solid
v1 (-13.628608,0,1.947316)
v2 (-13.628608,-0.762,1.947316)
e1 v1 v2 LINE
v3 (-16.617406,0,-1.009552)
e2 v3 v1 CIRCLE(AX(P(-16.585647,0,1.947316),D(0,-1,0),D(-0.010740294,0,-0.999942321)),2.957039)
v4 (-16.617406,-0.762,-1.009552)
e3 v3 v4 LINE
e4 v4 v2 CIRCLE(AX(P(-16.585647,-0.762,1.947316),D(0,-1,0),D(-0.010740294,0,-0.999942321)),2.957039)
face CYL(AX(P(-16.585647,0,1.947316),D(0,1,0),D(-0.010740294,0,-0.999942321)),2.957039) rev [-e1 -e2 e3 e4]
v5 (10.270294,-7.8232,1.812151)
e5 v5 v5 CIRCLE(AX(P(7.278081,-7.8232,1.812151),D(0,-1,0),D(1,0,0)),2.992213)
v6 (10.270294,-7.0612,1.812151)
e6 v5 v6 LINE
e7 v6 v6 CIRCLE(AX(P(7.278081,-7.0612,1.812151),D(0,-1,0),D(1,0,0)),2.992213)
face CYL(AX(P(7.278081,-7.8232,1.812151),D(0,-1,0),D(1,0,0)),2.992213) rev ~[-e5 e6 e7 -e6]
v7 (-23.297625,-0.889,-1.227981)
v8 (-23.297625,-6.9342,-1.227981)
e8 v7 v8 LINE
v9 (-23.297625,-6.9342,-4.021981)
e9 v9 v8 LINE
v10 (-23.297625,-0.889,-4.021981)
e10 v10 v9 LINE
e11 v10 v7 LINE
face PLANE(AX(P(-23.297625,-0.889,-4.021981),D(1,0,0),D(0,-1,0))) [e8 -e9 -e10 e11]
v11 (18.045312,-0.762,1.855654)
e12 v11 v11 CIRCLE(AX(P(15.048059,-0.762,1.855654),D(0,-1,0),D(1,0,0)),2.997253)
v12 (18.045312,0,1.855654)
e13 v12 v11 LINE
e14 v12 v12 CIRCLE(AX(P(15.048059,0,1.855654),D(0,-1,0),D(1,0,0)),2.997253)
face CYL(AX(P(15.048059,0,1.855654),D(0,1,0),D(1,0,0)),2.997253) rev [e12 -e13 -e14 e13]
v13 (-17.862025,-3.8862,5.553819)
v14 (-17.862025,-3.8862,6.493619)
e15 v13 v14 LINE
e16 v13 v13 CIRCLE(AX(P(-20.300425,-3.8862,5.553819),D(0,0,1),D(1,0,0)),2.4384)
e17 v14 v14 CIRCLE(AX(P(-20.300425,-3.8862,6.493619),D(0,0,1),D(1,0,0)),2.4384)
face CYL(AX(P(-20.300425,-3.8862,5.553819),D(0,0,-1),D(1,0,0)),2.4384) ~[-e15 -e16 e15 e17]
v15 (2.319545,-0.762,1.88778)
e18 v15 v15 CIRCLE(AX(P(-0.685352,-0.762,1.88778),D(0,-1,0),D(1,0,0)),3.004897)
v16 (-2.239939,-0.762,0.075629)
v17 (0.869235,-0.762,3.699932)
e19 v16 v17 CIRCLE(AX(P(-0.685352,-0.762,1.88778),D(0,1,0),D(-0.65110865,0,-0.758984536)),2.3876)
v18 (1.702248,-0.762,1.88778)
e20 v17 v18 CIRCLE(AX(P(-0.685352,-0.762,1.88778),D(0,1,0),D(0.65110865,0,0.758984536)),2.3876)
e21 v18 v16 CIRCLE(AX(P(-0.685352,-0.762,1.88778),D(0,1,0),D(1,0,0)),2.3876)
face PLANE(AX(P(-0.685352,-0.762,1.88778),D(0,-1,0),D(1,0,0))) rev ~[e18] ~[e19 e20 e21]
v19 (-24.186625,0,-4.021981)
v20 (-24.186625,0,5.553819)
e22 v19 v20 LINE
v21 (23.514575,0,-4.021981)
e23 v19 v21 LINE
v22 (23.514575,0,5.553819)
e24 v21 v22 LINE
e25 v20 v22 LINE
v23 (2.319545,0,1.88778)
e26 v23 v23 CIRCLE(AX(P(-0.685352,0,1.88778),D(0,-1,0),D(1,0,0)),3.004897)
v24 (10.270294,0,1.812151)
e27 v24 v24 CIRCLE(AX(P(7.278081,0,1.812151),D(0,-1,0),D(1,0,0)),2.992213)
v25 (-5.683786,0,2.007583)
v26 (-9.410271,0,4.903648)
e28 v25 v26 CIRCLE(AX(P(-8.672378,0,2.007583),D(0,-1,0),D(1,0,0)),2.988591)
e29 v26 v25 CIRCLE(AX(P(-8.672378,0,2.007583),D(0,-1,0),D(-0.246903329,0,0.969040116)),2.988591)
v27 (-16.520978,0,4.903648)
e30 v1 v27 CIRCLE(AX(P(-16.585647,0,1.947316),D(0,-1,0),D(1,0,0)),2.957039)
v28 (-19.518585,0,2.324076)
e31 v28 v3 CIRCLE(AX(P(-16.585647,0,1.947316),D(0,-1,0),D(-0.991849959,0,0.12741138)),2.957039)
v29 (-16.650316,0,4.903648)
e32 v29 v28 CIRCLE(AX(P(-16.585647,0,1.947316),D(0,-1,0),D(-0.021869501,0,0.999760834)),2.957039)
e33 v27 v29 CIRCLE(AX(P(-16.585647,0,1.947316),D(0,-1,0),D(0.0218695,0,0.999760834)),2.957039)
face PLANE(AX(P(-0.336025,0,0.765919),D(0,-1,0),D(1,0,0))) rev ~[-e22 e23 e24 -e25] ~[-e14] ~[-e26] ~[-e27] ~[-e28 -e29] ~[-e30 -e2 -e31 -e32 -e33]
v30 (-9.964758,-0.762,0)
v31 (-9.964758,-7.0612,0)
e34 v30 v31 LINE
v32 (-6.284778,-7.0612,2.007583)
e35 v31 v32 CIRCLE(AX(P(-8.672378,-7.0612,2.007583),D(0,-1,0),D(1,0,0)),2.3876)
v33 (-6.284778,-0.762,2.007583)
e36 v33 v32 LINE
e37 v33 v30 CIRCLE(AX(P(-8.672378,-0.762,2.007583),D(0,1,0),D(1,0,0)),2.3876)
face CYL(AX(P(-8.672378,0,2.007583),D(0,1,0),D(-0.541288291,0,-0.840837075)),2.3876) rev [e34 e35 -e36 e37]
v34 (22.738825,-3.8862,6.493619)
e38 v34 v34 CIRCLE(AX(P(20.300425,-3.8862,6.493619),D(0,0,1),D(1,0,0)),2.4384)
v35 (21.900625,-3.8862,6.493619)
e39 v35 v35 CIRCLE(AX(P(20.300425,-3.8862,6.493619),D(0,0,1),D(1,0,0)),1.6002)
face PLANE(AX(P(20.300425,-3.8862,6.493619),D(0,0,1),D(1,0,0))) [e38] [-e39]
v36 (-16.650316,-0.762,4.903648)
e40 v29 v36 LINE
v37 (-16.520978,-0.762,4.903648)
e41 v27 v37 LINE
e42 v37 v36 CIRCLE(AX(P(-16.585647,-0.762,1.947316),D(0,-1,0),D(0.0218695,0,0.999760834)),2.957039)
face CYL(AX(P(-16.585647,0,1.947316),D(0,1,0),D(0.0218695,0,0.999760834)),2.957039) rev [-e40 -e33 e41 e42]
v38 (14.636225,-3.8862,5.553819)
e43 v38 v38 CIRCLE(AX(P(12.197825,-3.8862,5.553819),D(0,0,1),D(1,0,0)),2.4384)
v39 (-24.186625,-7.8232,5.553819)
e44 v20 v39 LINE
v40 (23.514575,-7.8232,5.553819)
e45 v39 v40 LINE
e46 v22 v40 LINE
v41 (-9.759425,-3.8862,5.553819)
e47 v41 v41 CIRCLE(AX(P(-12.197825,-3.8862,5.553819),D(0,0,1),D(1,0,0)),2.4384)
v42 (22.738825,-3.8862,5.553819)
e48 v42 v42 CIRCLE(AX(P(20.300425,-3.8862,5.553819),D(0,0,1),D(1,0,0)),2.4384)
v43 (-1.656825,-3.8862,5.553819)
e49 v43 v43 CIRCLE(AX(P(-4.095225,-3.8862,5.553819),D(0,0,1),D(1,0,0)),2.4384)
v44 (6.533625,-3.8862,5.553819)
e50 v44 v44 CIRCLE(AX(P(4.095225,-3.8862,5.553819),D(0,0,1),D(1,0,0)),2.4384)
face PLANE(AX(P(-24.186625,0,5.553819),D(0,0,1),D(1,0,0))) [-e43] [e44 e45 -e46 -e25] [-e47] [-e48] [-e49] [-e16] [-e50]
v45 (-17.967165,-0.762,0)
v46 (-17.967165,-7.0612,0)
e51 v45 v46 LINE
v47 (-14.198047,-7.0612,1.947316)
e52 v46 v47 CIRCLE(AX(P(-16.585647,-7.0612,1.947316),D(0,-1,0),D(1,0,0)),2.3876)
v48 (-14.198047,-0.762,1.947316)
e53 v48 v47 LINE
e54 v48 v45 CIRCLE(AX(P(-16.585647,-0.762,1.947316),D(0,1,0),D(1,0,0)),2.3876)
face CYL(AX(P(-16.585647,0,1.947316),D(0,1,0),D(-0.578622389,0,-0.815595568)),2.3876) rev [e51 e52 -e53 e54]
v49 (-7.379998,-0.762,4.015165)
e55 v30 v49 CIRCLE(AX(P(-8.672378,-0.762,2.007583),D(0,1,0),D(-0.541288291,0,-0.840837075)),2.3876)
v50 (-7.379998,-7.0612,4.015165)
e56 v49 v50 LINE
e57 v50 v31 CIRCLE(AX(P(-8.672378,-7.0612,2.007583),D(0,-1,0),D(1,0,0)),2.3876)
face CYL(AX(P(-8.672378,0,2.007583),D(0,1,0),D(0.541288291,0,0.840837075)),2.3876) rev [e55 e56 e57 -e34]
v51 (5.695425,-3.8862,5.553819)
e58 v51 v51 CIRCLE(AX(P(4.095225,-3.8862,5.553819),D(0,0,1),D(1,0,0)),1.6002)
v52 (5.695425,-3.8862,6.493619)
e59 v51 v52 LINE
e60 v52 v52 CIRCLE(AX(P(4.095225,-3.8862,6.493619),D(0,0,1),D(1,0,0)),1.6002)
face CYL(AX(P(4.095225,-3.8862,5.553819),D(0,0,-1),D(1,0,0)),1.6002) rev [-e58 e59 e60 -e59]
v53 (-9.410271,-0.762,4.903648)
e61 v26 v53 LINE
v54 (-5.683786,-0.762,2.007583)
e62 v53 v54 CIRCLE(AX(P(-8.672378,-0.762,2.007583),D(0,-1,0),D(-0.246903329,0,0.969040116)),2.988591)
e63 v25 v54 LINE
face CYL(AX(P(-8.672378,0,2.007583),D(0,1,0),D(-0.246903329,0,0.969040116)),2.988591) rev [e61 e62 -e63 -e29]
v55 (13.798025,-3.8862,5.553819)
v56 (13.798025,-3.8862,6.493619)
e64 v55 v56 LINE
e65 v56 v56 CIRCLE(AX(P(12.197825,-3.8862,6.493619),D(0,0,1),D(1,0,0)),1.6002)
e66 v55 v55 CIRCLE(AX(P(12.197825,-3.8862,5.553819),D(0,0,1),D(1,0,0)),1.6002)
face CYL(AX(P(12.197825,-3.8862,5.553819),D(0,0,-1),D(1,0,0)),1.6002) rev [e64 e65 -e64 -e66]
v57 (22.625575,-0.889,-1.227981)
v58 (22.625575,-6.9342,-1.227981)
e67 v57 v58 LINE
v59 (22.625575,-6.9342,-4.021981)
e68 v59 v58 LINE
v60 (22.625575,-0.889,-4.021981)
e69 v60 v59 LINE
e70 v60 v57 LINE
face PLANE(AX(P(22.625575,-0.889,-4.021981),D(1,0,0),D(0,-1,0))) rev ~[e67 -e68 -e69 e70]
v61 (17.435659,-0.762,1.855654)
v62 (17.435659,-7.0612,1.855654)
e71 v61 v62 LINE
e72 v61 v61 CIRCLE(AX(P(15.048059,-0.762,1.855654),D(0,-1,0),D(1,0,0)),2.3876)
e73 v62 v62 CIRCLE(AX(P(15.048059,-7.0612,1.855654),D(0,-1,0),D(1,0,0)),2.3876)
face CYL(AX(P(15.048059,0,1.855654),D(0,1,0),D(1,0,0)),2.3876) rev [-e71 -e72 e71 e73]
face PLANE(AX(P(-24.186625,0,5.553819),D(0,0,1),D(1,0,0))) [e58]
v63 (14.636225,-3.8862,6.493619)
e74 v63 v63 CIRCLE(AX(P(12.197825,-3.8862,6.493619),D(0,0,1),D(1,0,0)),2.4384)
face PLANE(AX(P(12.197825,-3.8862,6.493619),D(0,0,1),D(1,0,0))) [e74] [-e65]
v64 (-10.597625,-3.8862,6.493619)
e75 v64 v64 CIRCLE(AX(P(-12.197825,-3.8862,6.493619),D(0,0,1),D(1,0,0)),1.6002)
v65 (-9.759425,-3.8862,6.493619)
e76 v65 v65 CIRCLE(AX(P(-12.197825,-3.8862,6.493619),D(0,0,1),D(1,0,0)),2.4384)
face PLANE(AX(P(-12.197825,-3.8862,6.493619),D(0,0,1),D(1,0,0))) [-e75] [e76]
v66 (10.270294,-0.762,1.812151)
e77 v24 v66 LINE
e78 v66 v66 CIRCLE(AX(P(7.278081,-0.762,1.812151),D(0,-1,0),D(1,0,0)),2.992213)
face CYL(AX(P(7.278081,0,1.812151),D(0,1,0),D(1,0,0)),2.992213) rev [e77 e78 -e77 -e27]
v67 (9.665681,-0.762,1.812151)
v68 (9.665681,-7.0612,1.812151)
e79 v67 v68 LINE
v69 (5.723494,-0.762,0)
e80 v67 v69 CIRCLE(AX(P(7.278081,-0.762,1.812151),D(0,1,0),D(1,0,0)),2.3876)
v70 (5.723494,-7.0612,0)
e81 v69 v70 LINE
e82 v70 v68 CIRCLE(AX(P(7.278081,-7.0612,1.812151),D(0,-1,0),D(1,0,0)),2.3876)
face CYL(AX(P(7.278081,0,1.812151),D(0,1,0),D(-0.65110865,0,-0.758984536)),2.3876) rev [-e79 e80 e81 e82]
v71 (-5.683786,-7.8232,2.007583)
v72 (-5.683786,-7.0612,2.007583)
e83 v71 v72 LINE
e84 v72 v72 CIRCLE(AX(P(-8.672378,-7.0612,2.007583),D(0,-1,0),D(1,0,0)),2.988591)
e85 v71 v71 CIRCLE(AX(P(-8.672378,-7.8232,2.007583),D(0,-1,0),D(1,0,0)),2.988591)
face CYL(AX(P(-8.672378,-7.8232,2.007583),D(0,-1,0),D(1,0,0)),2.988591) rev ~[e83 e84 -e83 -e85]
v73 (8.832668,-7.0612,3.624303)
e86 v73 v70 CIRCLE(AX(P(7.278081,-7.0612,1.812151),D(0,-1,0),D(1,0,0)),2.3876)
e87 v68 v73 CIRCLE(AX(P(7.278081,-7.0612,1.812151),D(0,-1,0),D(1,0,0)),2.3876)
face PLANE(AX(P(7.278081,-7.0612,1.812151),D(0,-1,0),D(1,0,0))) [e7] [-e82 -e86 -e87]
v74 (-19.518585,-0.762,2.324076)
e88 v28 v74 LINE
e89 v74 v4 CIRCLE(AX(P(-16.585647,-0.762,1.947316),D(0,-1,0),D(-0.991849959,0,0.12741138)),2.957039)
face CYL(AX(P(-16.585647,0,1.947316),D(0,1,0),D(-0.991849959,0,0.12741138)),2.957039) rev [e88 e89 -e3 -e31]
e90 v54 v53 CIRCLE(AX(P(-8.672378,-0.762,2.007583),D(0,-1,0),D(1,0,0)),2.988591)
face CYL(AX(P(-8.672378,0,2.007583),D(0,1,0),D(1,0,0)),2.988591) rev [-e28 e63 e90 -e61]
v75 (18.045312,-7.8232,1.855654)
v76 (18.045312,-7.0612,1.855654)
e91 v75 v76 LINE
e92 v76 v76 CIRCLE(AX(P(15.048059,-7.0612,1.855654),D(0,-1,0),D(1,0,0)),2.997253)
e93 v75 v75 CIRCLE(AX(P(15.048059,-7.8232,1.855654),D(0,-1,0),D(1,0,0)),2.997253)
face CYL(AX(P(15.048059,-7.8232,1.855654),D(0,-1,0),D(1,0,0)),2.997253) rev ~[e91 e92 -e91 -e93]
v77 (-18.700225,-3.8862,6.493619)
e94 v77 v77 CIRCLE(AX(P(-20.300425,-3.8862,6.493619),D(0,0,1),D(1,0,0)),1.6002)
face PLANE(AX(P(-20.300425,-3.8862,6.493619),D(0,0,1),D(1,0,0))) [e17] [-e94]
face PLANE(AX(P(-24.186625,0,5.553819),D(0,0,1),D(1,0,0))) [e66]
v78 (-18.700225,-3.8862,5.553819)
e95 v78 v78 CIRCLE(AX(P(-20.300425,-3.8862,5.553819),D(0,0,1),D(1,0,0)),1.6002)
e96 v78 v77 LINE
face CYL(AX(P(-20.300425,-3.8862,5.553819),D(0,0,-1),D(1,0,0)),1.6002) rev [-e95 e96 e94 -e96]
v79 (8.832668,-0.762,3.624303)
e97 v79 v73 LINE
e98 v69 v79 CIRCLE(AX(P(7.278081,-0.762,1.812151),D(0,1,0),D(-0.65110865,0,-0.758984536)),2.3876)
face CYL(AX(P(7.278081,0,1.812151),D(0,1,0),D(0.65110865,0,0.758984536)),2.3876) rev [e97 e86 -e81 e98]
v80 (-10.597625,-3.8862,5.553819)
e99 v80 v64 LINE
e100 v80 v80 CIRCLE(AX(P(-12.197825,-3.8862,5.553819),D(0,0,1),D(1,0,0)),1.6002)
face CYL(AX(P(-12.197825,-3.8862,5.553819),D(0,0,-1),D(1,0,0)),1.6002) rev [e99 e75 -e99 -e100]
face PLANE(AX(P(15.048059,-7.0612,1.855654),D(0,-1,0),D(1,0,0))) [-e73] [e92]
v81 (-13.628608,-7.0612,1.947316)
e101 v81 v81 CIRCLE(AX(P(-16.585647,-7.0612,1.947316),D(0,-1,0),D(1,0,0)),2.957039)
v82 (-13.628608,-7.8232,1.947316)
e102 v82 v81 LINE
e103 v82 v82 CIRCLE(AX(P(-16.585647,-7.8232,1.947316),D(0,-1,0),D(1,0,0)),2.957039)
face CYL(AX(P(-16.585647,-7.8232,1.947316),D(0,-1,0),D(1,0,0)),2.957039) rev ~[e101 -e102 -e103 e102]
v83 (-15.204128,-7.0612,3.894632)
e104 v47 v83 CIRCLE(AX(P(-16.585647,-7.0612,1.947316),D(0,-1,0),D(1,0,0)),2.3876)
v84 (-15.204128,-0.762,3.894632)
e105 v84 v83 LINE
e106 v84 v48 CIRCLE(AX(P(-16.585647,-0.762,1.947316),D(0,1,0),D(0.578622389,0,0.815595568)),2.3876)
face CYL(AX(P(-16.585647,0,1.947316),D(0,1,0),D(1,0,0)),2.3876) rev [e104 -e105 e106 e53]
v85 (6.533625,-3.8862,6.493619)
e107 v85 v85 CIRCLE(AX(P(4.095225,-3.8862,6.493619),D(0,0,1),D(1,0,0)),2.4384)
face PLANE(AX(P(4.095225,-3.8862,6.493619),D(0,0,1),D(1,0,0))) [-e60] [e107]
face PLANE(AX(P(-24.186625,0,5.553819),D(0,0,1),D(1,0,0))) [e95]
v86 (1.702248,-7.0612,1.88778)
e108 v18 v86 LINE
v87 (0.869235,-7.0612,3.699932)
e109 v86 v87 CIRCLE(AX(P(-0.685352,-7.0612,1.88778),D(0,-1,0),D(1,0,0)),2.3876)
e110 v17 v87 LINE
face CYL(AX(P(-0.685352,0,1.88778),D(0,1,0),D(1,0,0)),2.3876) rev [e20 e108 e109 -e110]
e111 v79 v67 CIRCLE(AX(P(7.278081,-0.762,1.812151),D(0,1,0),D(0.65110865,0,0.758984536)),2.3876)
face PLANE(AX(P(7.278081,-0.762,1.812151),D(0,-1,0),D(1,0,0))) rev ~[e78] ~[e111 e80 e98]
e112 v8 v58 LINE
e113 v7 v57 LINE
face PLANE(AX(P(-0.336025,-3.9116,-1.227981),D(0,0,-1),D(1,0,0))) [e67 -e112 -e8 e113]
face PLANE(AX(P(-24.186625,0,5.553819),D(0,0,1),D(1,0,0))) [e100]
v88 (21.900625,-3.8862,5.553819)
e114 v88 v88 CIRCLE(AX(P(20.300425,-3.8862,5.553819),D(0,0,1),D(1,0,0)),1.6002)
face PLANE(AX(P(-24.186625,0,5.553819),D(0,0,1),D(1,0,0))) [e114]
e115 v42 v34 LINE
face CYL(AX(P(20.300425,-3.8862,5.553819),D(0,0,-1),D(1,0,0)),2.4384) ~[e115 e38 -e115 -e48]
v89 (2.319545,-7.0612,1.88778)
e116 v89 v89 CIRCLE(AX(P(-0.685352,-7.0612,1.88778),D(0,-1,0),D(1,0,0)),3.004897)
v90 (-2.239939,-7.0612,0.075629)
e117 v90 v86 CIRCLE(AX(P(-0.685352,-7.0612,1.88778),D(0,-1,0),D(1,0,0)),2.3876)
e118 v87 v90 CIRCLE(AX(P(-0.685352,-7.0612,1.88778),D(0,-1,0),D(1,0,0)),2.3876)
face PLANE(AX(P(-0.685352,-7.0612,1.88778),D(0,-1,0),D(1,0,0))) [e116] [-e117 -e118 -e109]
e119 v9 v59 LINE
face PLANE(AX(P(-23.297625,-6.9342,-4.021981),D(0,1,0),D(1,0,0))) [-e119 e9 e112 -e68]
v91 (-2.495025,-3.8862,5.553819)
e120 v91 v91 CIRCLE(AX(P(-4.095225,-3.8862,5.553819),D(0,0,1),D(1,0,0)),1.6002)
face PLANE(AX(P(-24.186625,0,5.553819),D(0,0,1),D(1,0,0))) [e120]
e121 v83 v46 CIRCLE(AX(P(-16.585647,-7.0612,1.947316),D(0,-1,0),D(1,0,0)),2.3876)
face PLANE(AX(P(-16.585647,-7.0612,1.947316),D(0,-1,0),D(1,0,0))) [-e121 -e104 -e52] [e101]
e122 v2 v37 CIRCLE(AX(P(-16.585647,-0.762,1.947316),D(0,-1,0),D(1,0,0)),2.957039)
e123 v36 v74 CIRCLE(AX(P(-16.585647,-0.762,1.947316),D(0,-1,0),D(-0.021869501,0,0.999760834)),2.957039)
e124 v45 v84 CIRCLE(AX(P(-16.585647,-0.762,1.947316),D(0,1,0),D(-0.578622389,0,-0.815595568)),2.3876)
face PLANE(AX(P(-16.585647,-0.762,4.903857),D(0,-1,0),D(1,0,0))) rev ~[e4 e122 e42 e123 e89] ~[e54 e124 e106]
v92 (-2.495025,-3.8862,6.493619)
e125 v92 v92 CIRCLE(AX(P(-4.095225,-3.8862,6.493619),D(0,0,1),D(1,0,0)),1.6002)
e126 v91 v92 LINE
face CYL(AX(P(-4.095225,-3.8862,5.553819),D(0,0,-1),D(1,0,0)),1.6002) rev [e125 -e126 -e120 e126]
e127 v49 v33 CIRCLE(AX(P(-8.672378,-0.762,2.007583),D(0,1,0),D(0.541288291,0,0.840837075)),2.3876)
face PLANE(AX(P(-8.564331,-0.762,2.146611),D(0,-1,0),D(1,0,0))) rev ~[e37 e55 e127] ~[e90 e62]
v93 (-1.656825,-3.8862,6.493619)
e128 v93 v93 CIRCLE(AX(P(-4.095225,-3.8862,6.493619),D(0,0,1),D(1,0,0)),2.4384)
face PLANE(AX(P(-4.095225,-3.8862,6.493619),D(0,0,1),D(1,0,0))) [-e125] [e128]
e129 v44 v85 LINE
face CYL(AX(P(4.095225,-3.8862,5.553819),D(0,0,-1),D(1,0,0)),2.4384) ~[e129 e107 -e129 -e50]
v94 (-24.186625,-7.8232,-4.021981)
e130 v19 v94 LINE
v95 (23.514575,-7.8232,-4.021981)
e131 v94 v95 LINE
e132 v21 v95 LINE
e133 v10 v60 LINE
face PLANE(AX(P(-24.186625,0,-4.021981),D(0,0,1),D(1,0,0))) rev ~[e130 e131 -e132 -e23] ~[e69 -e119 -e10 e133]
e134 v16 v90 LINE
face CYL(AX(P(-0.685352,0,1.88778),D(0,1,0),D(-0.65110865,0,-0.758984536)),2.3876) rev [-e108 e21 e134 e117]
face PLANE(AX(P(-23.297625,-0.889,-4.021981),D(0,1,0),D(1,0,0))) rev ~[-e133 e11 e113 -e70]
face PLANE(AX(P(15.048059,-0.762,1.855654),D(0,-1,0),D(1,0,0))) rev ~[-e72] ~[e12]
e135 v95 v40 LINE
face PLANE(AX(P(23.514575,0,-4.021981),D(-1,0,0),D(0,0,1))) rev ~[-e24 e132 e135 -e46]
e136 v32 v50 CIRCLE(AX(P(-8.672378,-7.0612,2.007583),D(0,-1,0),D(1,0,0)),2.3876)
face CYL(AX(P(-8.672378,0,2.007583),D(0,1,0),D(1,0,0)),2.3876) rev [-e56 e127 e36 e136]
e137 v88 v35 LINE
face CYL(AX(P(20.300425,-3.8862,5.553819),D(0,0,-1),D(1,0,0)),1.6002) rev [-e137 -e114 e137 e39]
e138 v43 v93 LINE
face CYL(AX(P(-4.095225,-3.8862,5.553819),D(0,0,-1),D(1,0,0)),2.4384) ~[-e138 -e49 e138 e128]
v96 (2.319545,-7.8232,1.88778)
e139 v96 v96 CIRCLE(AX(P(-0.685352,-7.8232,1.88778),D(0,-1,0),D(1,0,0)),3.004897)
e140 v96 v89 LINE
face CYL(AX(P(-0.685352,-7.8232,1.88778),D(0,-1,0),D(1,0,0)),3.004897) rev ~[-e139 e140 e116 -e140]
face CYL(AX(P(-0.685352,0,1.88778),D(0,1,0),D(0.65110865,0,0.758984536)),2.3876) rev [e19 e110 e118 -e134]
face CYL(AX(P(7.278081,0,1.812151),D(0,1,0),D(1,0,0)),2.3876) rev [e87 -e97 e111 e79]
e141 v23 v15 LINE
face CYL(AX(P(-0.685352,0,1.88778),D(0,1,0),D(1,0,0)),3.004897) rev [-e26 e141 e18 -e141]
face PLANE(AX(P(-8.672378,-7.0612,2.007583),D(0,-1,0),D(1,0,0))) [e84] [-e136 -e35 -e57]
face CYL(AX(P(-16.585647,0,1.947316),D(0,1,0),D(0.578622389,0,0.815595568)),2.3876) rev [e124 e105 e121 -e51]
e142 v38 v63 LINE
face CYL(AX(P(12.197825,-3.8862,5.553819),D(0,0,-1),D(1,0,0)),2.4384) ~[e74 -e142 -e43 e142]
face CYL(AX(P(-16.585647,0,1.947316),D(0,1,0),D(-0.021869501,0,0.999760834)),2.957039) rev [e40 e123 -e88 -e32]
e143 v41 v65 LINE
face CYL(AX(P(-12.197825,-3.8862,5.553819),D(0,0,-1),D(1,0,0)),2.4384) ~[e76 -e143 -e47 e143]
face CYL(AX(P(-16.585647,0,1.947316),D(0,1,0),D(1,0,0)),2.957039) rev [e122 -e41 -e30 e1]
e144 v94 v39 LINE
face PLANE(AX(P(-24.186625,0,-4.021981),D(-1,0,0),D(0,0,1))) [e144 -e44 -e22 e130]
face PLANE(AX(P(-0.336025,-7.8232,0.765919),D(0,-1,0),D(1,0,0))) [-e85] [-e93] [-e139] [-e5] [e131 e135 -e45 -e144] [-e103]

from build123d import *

# Parameters (mm, degrees)
F0_W      = 47.7012
F0_H      = 9.5758
F1_DEPTH  = 7.8232
F2_R      = 2.3876
F3_DEPTH  = 9.53232
F2_R_2    = 3.0048968535
F2_R_3    = 2.9922132855
F2_R_4    = 2.9972531663
F4_DEPTH  = 0.762
F5_R      = 2.9885913722
F5_R_2    = 3.0048968535
F5_R_3    = 2.9922132855
F5_R_4    = 2.9972531663
F5_R_5    = 2.9570387739
F6_DEPTH  = 25.4
F7_R      = 3.0048968535
F7_R_2    = 2.3876
F7_R_3    = 2.9922132855
F7_R_4    = 2.9972531663
F7_R_5    = 2.9885913722
F7_R_6    = 2.9570387739
F8_DEPTH  = 0.762
F9_R      = 2.4384
F9_R_2    = 1.6002
F10_DEPTH = 0.9398
F11_W     = 45.9232
F11_H     = 6.0452
F12_DEPTH = 2.794


with BuildPart() as f1:
    # F0 (on Front) → F1 (new body)
    with BuildSketch(Plane.XZ):
        with Locations((-0.3360249102, 0.7659190055)):
            Rectangle(F0_W, F0_H)
    extrude(amount=F1_DEPTH)

    # F2 (on Front) → F3 (cut)
    with BuildSketch(Plane.XZ):
        with Locations((15.0480590754, 1.8556544835)):
            Circle(F2_R)
        with BuildLine():
            Line((5.7234941433, 0), (8.8326681668, 3.624302958))
            ThreePointArc((8.8326681668, 3.624302958), (5.4659296761, 3.3667384908), (5.7234941433, 0))
        make_face()
        with BuildLine():
            ThreePointArc((5.7234941433, 0), (8.275302748, -0.3572223603), (9.6656811551, 1.812151479))
            ThreePointArc((9.6656811551, 1.812151479), (9.4474549944, 2.8093730719), (8.8326681668, 3.624302958))
            Line((8.8326681668, 3.624302958), (5.7234941433, 0))
        make_face()
        with BuildLine():
            Line((-2.2399391754, 0.0756290061), (0.8692348481, 3.6999319641))
            ThreePointArc((0.8692348481, 3.6999319641), (-2.4975036427, 3.4423674968), (-2.2399391754, 0.0756290061))
        make_face()
        with BuildLine():
            ThreePointArc((-2.2399391754, 0.0756290061), (0.3118694292, -0.2815933542), (1.7022478363, 1.8877804851))
            ThreePointArc((1.7022478363, 1.8877804851), (1.4840216756, 2.885002078), (0.8692348481, 3.6999319641))
            Line((0.8692348481, 3.6999319641), (-2.2399391754, 0.0756290061))
        make_face()
        with BuildLine():
            Line((-9.9647576041, 0), (-7.3799977582, 4.0151651995))
            ThreePointArc((-7.3799977582, 4.0151651995), (-10.6799602808, 3.2999625227), (-9.9647576041, 0))
        make_face()
        with BuildLine():
            ThreePointArc((-9.9647576041, 0), (-7.5289295065, -0.0884040491), (-6.2847776811, 2.0075825997))
            ThreePointArc((-6.2847776811, 2.0075825997), (-6.5763910323, 3.1510307743), (-7.3799977582, 4.0151651995))
            Line((-7.3799977582, 4.0151651995), (-9.9647576041, 0))
        make_face()
        with BuildLine():
            Line((-17.9671654597, 0), (-15.2041278281, 3.8946319578))
            ThreePointArc((-15.2041278281, 3.8946319578), (-18.5329626228, 3.3288347947), (-17.9671654597, 0))
        make_face()
        with BuildLine():
            ThreePointArc((-17.9671654597, 0), (-15.4897179429, -0.1739039631), (-14.1980466439, 1.9473159789))
            ThreePointArc((-14.1980466439, 1.9473159789), (-14.4644267019, 3.0432446799), (-15.2041278281, 3.8946319578))
            Line((-15.2041278281, 3.8946319578), (-17.9671654597, 0))
        make_face()
    extrude(amount=F3_DEPTH, mode=Mode.SUBTRACT)

    # F2 (on Front) → F4 (cut)
    with BuildSketch(Plane.XZ):
        with BuildLine():
            ThreePointArc((-16.5209776811, 4.9036475293), (-16.5856466439, 4.9043547528), (-16.6503156067, 4.9036475293))
            Line((-16.6503156067, 4.9036475293), (-16.5209776811, 4.9036475293))
        make_face()
        with BuildLine():
            ThreePointArc((-5.6837863089, 2.0075825997), (-6.8384723861, 4.3673431298), (-9.41027084, 4.9036475293))
            ThreePointArc((-9.41027084, 4.9036475293), (-10.5062829761, -0.3521779303), (-5.6837863089, 2.0075825997))
        make_face()
        with BuildLine():
            ThreePointArc((-7.3799977582, 4.0151651995), (-6.5763910323, 3.1510307743), (-6.2847776811, 2.0075825997))
            ThreePointArc((-6.2847776811, 2.0075825997), (-7.5289295065, -0.0884040491), (-9.9647576041, 0))
            ThreePointArc((-9.9647576041, 0), (-10.6799602808, 3.2999625227), (-7.3799977582, 4.0151651995))
        make_face(mode=Mode.SUBTRACT)
        with BuildLine():
            Line((-16.5209776811, 4.9036475293), (-16.6503156067, 4.9036475293))
            ThreePointArc((-16.6503156067, 4.9036475293), (-18.5630084962, 4.1459788488), (-19.5185854293, 2.3240763694))
            ThreePointArc((-19.5185854293, 2.3240763694), (-18.8162584098, 0.0060665204), (-16.6174061088, -1.0095522371))
            ThreePointArc((-16.6174061088, -1.0095522371), (-14.5059634539, -0.1548248679), (-13.6286078699, 1.9473159789))
            ThreePointArc((-13.6286078699, 1.9473159789), (-14.4719642007, 4.0152678256), (-16.5209776811, 4.9036475293))
        make_face()
        with BuildLine():
            ThreePointArc((-15.2041278281, 3.8946319578), (-14.4644267019, 3.0432446799), (-14.1980466439, 1.9473159789))
            ThreePointArc((-14.1980466439, 1.9473159789), (-15.4897179429, -0.1739039631), (-17.9671654597, 0))
            ThreePointArc((-17.9671654597, 0), (-18.5329626228, 3.3288347947), (-15.2041278281, 3.8946319578))
        make_face(mode=Mode.SUBTRACT)
        with Locations((-0.6853521637, 1.8877804851)):
            Circle(F2_R_2)
        with BuildLine():
            ThreePointArc((0.8692348481, 3.6999319641), (1.4840216756, 2.885002078), (1.7022478363, 1.8877804851))
            ThreePointArc((1.7022478363, 1.8877804851), (0.3118694292, -0.2815933542), (-2.2399391754, 0.0756290061))
            ThreePointArc((-2.2399391754, 0.0756290061), (-2.4975036427, 3.4423674968), (0.8692348481, 3.6999319641))
        make_face(mode=Mode.SUBTRACT)
        with Locations((7.2780811551, 1.812151479)):
            Circle(F2_R_3)
        with BuildLine():
            ThreePointArc((8.8326681668, 3.624302958), (9.4474549944, 2.8093730719), (9.6656811551, 1.812151479))
            ThreePointArc((9.6656811551, 1.812151479), (8.275302748, -0.3572223603), (5.7234941433, 0))
            ThreePointArc((5.7234941433, 0), (5.4659296761, 3.3667384908), (8.8326681668, 3.624302958))
        make_face(mode=Mode.SUBTRACT)
        with Locations((15.0480590754, 1.8556544835)):
            Circle(F2_R_4)
        with Locations((15.0480590754, 1.8556544835)):
            Circle(F2_R, mode=Mode.SUBTRACT)
    extrude(amount=F4_DEPTH, mode=Mode.SUBTRACT)

    # F5 (on Front) → F6 (cut)
    with BuildSketch(Plane.XZ):
        with Locations((-8.6723776811, 2.0075825997)):
            Circle(F5_R)
        with Locations((-0.6853521637, 1.8877804851)):
            Circle(F5_R_2)
        with Locations((7.2780811551, 1.812151479)):
            Circle(F5_R_3)
        with Locations((15.0480590754, 1.8556544835)):
            Circle(F5_R_4)
        with Locations((-16.5856466439, 1.9473159789)):
            Circle(F5_R_5)
    extrude(amount=-F6_DEPTH, mode=Mode.SUBTRACT)

    # F7 (on face) → F8 (cut)
    with BuildSketch(Plane.XZ.offset(7.8232)):
        with Locations((-0.6853521637, 1.8877804851)):
            Circle(F7_R)
        with Locations((-0.6853521637, 1.8877804851)):
            Circle(F7_R_2, mode=Mode.SUBTRACT)
        with Locations((7.2780811551, 1.812151479)):
            Circle(F7_R_3)
        with Locations((7.2780811551, 1.812151479)):
            Circle(F7_R_2, mode=Mode.SUBTRACT)
        with Locations((15.0480590754, 1.8556544835)):
            Circle(F7_R_4)
        with Locations((15.0480590754, 1.8556544835)):
            Circle(F7_R_2, mode=Mode.SUBTRACT)
        with Locations((-8.6723776811, 2.0075825997)):
            Circle(F7_R_5)
        with Locations((-8.6723776811, 2.0075825997)):
            Circle(F7_R_2, mode=Mode.SUBTRACT)
        with Locations((-16.5856466439, 1.9473159789)):
            Circle(F7_R_6)
        with Locations((-16.5856466439, 1.9473159789)):
            Circle(F7_R_2, mode=Mode.SUBTRACT)
    extrude(amount=-F8_DEPTH, mode=Mode.SUBTRACT)

    # F9 (on face) → F10 (join)
    with BuildSketch(Plane.XY.offset(5.5538190055)):
        with Locations((-20.3004249102, -3.8862)):
            Circle(F9_R)
        with Locations((-20.3004249102, -3.8862)):
            Circle(F9_R_2, mode=Mode.SUBTRACT)
        with Locations((-12.1978249102, -3.8862)):
            Circle(F9_R)
        with Locations((-12.1978249102, -3.8862)):
            Circle(F9_R_2, mode=Mode.SUBTRACT)
        with Locations((-4.0952249102, -3.8862)):
            Circle(F9_R)
        with Locations((-4.0952249102, -3.8862)):
            Circle(F9_R_2, mode=Mode.SUBTRACT)
        with Locations((4.0952249102, -3.8862)):
            Circle(F9_R)
        with Locations((4.0952249102, -3.8862)):
            Circle(F9_R_2, mode=Mode.SUBTRACT)
        with Locations((12.1978249102, -3.8862)):
            Circle(F9_R)
        with Locations((12.1978249102, -3.8862)):
            Circle(F9_R_2, mode=Mode.SUBTRACT)
        with Locations((20.3004249102, -3.8862)):
            Circle(F9_R)
        with Locations((20.3004249102, -3.8862)):
            Circle(F9_R_2, mode=Mode.SUBTRACT)
    extrude(amount=F10_DEPTH)

    # F11 (on face) → F12 (cut)
    with BuildSketch(Plane(origin=(0, 0, -4.0219809945), x_dir=(1, 0, 0), z_dir=(0, 0, -1))):
        with Locations((-0.3360249102, 3.9116)):
            Rectangle(F11_W, F11_H)
    extrude(amount=-F12_DEPTH, mode=Mode.SUBTRACT)


solid = f1.part
